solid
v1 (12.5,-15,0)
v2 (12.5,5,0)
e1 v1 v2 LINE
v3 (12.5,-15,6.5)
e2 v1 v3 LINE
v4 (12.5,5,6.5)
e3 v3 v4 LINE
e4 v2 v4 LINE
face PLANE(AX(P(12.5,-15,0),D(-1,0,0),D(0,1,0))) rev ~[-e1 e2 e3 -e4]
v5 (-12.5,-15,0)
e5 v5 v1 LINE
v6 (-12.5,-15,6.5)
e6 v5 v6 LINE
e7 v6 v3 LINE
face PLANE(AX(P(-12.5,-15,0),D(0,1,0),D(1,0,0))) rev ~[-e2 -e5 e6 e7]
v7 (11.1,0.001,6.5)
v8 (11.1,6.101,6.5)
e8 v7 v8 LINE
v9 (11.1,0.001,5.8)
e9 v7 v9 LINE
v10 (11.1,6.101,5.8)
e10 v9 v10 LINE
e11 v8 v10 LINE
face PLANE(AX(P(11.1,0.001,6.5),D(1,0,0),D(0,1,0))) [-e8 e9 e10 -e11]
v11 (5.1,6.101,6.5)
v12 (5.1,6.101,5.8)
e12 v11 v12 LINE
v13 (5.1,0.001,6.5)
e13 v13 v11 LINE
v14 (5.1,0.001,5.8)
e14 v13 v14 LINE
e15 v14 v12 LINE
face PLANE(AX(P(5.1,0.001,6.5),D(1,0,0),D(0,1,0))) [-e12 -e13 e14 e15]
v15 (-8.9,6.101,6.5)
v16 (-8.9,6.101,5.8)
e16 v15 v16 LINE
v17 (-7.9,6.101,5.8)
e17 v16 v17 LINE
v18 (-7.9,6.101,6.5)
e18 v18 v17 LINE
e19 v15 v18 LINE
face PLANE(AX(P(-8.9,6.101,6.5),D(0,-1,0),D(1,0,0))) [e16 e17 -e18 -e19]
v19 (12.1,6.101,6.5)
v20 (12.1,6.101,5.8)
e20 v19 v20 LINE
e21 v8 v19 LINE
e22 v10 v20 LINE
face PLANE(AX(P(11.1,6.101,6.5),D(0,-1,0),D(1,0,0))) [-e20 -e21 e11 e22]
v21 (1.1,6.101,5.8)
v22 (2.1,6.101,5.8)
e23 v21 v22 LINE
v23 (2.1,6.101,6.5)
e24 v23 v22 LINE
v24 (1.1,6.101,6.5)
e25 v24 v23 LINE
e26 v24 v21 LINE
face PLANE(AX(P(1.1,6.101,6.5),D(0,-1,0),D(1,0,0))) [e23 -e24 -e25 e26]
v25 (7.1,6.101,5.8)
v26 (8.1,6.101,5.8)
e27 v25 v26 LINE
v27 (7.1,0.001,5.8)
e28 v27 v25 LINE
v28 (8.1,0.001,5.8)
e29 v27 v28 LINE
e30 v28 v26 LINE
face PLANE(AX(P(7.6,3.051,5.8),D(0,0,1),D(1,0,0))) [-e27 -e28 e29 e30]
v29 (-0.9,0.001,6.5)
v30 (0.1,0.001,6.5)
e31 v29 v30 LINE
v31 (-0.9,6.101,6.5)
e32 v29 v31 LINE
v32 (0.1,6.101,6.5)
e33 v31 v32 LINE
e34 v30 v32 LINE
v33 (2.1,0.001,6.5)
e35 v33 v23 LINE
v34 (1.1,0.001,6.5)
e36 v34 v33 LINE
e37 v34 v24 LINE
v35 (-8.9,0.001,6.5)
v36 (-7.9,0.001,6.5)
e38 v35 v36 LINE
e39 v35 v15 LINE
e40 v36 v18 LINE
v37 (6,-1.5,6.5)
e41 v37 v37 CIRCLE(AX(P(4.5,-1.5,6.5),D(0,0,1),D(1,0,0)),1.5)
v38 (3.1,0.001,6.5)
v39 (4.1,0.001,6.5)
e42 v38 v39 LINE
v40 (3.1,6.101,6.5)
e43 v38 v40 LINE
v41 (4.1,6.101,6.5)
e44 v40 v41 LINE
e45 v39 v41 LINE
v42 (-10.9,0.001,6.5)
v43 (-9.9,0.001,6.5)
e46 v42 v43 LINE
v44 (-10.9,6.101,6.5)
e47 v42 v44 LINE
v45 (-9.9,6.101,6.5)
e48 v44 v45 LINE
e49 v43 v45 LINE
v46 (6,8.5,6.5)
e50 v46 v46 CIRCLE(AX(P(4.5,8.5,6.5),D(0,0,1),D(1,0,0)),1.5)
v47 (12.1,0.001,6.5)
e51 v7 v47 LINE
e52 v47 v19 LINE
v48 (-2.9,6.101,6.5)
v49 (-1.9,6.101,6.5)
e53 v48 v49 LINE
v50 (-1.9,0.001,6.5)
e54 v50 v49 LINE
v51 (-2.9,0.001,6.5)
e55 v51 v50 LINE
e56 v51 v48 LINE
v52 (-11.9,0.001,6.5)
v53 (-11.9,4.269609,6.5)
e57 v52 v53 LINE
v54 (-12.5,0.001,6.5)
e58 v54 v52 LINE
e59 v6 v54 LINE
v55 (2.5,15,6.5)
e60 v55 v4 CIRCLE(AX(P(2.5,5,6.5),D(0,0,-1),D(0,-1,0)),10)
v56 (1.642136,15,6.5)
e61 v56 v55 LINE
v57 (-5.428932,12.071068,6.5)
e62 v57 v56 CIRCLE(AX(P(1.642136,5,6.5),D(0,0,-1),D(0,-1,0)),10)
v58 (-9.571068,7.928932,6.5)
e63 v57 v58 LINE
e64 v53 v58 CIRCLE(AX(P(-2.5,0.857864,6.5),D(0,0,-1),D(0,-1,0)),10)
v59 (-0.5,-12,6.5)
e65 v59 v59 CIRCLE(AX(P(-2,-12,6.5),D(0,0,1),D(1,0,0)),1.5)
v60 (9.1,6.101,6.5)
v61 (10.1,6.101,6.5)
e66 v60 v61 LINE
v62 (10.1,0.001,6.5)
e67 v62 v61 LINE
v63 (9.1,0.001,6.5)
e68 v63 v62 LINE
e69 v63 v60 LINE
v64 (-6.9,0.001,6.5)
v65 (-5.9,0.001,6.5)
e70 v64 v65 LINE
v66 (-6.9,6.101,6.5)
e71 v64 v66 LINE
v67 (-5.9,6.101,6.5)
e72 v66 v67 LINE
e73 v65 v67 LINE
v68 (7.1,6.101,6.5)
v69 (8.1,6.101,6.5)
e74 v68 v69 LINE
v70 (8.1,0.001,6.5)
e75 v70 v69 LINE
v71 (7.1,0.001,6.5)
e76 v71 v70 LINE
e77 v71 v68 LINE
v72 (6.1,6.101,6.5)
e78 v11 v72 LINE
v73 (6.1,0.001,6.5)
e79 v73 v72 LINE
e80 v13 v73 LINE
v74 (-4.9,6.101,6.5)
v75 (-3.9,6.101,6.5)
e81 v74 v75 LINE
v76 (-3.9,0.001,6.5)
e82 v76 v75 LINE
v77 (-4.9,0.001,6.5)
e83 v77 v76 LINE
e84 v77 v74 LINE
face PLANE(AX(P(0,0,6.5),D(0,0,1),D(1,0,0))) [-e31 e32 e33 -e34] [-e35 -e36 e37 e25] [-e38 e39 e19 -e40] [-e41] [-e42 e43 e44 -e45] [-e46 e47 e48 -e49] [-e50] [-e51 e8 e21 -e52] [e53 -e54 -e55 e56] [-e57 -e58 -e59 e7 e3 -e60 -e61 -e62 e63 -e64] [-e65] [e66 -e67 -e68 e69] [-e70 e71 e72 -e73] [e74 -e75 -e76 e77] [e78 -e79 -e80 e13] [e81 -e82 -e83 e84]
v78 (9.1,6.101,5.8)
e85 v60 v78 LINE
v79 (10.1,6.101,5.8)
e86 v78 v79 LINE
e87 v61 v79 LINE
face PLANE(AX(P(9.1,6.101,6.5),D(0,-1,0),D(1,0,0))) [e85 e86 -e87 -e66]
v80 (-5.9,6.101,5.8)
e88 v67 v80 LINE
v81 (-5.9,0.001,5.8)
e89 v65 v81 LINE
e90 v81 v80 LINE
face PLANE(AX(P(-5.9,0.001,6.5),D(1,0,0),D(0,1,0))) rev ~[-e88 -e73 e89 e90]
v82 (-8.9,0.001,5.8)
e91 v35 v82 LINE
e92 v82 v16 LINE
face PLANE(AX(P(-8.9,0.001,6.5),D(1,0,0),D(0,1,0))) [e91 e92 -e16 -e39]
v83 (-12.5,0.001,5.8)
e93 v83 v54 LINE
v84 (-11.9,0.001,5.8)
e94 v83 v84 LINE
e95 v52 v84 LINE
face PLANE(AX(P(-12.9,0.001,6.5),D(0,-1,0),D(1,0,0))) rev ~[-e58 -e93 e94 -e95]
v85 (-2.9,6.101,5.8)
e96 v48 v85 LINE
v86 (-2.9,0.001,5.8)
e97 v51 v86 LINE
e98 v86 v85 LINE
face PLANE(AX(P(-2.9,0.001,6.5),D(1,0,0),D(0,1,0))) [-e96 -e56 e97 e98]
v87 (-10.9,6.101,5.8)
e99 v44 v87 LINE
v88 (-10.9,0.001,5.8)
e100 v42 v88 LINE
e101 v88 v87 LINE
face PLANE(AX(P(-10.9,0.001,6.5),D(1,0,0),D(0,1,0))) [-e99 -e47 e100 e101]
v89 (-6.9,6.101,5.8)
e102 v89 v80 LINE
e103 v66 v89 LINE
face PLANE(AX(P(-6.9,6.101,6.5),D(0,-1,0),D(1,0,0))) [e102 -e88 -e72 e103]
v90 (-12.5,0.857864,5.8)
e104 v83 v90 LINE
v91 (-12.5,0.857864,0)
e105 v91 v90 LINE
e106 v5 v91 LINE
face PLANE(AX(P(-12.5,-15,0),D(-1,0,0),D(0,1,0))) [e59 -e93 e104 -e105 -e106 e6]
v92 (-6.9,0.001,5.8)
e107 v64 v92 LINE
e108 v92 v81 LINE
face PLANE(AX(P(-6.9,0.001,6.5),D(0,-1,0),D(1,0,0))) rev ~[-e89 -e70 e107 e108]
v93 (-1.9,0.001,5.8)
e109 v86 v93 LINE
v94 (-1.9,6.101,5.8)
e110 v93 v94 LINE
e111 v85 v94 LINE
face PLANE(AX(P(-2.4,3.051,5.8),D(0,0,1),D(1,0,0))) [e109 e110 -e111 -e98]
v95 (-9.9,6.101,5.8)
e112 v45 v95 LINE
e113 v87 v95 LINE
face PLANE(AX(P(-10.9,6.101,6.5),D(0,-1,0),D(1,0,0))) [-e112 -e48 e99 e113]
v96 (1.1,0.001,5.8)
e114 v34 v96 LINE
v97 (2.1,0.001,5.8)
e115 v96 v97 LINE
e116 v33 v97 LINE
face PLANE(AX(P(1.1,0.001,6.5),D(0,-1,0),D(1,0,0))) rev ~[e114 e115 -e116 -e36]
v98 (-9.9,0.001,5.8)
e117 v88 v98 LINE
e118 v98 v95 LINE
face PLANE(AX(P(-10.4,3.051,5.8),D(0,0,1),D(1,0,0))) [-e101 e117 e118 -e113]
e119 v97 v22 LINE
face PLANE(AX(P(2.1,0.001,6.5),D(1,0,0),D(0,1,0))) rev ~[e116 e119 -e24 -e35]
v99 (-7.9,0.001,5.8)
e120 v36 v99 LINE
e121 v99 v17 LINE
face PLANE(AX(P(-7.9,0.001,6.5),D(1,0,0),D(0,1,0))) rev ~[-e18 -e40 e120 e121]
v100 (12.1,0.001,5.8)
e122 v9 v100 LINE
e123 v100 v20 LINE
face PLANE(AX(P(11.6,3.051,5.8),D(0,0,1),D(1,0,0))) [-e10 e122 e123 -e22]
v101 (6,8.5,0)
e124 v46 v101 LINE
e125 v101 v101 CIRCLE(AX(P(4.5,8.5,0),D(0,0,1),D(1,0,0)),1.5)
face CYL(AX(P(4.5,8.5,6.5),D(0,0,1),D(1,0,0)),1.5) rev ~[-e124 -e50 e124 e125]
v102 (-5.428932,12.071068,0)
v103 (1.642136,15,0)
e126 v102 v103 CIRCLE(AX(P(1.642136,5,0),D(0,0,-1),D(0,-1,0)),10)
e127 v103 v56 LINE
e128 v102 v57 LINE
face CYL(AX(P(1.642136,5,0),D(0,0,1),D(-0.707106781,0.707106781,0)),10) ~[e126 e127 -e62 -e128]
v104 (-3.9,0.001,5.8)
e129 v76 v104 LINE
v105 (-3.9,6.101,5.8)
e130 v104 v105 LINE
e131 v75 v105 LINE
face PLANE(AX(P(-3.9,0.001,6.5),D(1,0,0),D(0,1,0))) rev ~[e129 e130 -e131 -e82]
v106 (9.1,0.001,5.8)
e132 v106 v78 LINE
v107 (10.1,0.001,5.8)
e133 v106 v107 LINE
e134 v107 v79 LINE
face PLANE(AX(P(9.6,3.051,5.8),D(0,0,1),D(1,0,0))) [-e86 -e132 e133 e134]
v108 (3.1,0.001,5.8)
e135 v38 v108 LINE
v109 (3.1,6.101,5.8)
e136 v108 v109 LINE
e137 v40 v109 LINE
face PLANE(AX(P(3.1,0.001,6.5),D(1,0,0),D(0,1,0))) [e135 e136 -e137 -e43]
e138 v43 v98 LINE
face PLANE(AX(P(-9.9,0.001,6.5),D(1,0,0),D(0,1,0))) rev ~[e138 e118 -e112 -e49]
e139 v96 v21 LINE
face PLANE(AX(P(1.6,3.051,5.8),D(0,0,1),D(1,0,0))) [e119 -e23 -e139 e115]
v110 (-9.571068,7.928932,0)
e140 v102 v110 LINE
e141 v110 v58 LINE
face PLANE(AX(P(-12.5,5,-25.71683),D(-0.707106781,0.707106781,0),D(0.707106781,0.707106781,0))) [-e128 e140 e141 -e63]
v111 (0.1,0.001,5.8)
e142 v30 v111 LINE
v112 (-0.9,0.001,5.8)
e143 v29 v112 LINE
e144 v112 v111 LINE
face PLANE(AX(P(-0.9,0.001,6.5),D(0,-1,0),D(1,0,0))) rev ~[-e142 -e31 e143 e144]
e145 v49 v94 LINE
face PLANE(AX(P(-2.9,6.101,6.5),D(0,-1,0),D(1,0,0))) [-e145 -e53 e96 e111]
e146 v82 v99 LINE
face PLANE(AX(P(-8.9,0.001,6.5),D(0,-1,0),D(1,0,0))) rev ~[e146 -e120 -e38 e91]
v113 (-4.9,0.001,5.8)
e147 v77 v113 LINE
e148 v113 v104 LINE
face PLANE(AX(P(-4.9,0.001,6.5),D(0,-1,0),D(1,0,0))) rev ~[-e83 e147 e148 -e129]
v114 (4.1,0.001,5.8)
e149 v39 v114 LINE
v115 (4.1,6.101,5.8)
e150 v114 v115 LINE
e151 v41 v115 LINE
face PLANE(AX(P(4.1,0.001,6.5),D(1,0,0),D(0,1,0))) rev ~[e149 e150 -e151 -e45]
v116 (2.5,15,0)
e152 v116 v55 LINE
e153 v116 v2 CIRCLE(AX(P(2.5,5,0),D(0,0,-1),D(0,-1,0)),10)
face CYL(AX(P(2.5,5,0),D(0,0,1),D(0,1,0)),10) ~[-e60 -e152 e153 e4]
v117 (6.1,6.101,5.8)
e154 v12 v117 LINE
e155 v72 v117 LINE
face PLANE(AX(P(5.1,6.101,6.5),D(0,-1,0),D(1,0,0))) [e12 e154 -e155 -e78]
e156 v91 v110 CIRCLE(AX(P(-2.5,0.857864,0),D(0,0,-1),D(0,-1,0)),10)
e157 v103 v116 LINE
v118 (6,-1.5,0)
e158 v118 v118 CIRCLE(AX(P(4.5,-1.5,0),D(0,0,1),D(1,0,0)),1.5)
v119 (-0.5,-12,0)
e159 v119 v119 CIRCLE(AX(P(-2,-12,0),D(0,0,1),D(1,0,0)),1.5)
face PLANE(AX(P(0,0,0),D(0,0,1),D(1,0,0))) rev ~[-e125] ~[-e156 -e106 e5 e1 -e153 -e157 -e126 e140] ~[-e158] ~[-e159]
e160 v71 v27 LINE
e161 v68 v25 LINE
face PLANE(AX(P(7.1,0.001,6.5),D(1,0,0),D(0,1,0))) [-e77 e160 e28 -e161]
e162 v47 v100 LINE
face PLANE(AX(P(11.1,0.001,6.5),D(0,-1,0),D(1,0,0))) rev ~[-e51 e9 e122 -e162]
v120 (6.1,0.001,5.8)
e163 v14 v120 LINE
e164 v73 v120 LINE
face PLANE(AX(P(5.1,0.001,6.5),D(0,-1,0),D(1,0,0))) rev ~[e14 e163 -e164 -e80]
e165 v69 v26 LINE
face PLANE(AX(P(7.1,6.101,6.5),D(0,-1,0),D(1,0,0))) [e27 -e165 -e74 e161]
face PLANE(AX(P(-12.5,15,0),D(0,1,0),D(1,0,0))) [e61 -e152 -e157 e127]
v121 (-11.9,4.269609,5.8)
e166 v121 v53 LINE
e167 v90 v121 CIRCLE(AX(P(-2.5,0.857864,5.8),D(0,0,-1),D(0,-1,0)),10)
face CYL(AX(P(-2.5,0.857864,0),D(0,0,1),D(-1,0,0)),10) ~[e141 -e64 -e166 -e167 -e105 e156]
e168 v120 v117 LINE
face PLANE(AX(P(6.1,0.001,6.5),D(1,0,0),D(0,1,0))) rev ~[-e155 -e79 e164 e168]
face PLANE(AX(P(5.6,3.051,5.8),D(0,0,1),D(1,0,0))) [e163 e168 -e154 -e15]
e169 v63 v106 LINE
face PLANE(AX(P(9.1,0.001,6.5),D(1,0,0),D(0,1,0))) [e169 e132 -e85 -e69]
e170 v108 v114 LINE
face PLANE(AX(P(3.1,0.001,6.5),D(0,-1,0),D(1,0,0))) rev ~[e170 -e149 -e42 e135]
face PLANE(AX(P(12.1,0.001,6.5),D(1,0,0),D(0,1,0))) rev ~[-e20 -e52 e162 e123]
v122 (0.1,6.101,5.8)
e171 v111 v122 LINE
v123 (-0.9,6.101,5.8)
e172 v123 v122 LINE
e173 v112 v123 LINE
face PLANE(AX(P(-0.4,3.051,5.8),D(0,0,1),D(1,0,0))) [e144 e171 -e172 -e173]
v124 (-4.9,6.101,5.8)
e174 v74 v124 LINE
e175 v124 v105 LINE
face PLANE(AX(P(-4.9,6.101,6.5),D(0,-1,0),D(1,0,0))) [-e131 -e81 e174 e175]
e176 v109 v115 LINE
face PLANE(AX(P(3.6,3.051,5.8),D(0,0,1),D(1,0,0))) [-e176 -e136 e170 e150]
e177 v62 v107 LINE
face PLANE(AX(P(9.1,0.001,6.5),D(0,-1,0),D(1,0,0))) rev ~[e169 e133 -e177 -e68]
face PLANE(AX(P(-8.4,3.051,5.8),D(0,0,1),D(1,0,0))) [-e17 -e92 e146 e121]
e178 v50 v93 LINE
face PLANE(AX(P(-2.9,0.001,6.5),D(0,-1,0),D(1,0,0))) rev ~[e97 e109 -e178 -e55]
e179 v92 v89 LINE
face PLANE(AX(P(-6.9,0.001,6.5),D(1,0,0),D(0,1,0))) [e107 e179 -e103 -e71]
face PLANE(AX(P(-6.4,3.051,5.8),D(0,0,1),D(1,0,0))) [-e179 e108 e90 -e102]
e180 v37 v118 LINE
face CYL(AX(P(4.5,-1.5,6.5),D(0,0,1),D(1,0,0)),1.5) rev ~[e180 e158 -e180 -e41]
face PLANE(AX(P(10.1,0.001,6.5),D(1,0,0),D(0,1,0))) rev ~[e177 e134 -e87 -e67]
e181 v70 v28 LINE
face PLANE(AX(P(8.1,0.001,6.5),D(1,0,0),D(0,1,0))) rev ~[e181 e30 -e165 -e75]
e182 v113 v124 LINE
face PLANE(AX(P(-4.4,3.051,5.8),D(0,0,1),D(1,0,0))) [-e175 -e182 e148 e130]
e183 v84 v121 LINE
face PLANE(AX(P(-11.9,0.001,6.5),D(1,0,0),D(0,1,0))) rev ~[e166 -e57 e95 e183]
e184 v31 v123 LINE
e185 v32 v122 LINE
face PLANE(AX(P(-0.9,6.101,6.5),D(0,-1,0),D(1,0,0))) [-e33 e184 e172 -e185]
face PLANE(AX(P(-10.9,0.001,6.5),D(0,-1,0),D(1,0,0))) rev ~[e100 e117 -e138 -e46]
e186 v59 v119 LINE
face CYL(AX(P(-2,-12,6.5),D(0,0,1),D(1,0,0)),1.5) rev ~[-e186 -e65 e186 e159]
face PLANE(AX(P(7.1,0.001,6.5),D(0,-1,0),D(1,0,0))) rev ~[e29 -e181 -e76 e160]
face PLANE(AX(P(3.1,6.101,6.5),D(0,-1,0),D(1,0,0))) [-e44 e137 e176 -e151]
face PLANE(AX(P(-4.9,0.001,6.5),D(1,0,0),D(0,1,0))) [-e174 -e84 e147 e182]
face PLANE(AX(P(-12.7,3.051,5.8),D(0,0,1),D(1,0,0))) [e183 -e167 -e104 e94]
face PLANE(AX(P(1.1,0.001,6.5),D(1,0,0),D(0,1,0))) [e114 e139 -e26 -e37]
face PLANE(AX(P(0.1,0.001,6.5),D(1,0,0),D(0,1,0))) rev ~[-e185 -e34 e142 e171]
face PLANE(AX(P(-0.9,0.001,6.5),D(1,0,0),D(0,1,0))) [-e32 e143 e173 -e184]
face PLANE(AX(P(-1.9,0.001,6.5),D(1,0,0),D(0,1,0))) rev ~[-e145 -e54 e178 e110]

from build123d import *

# Parameters (mm, degrees)
F0_W        = 25
F0_H        = 30
F1_DEPTH    = 6.5
F2_R        = 1.5
F3_DEPTH    = 6.501
F4_W        = 1
F4_H        = 6.1
F4_W_2      = 0.4
F4_W_3      = 0.6
F5_DEPTH    = 0.7
F6_T1_DEPTH = 57.9336597593
F7_R        = 10


# Not quite as in the source:
# - a fillet or chamfer that OpenCascade refuses, or shapes differently, is made with other operations: its cross-section is extruded or revolved along the edge and cut away or added


with BuildPart() as f1:
    # F0 (on Top) → F1 (new body)
    with BuildSketch(Plane.XY):
        Rectangle(F0_W, F0_H)
    extrude(amount=F1_DEPTH)

    # F2 (on face) → F3 (cut, through all)
    with BuildSketch(Plane.XY.offset(6.5)):
        with Locations((-2, -12)):
            Circle(F2_R)
        with Locations((4.5, -1.5)):
            Circle(F2_R)
        with Locations((4.5, 8.5)):
            Circle(F2_R)
    extrude(amount=-F3_DEPTH, mode=Mode.SUBTRACT)

    # F4 (on face) → F5 (cut)
    with BuildSketch(Plane.XY.offset(6.5)):
        with Locations((11.6, 3.051)):
            Rectangle(F4_W, F4_H)
        with Locations((9.6, 3.051)):
            Rectangle(F4_W, F4_H)
        with Locations((7.6, 3.051)):
            Rectangle(F4_W, F4_H)
        with Locations((5.6, 3.051)):
            Rectangle(F4_W, F4_H)
        with Locations((3.6, 3.051)):
            Rectangle(F4_W, F4_H)
        with Locations((1.6, 3.051)):
            Rectangle(F4_W, F4_H)
        with Locations((-0.4, 3.051)):
            Rectangle(F4_W, F4_H)
        with Locations((-2.4, 3.051)):
            Rectangle(F4_W, F4_H)
        with Locations((-4.4, 3.051)):
            Rectangle(F4_W, F4_H)
        with Locations((-6.4, 3.051)):
            Rectangle(F4_W, F4_H)
        with Locations((-8.4, 3.051)):
            Rectangle(F4_W, F4_H)
        with Locations((-10.4, 3.051)):
            Rectangle(F4_W, F4_H)
        with Locations((-12.7, 3.051)):
            Rectangle(F4_W_2, F4_H)
        with Locations((-12.2, 3.051)):
            Rectangle(F4_W_3, F4_H)
    extrude(amount=-F5_DEPTH, mode=Mode.SUBTRACT)

    # F6: chamfer of 10 on 1 edges, made by hand

    # F6_s2 → F6_t1 (cut)
    with BuildSketch(Plane.XY.offset(-25.7168298797)):
        Polygon((-12.5, 5), (-2.5, 15), (-12.5, 15), align=None)
    extrude(amount=F6_T1_DEPTH, mode=Mode.SUBTRACT)

    # F7
    f7_edges = [f1.edges().sort_by_distance(p)[0] for p in [
        (-2.5, 15, 3.25),
        (-12.5, 5, 2.9),
        (12.5, 15, 3.25),
    ]]
    fillet(f7_edges, radius=F7_R)


solid = f1.part
